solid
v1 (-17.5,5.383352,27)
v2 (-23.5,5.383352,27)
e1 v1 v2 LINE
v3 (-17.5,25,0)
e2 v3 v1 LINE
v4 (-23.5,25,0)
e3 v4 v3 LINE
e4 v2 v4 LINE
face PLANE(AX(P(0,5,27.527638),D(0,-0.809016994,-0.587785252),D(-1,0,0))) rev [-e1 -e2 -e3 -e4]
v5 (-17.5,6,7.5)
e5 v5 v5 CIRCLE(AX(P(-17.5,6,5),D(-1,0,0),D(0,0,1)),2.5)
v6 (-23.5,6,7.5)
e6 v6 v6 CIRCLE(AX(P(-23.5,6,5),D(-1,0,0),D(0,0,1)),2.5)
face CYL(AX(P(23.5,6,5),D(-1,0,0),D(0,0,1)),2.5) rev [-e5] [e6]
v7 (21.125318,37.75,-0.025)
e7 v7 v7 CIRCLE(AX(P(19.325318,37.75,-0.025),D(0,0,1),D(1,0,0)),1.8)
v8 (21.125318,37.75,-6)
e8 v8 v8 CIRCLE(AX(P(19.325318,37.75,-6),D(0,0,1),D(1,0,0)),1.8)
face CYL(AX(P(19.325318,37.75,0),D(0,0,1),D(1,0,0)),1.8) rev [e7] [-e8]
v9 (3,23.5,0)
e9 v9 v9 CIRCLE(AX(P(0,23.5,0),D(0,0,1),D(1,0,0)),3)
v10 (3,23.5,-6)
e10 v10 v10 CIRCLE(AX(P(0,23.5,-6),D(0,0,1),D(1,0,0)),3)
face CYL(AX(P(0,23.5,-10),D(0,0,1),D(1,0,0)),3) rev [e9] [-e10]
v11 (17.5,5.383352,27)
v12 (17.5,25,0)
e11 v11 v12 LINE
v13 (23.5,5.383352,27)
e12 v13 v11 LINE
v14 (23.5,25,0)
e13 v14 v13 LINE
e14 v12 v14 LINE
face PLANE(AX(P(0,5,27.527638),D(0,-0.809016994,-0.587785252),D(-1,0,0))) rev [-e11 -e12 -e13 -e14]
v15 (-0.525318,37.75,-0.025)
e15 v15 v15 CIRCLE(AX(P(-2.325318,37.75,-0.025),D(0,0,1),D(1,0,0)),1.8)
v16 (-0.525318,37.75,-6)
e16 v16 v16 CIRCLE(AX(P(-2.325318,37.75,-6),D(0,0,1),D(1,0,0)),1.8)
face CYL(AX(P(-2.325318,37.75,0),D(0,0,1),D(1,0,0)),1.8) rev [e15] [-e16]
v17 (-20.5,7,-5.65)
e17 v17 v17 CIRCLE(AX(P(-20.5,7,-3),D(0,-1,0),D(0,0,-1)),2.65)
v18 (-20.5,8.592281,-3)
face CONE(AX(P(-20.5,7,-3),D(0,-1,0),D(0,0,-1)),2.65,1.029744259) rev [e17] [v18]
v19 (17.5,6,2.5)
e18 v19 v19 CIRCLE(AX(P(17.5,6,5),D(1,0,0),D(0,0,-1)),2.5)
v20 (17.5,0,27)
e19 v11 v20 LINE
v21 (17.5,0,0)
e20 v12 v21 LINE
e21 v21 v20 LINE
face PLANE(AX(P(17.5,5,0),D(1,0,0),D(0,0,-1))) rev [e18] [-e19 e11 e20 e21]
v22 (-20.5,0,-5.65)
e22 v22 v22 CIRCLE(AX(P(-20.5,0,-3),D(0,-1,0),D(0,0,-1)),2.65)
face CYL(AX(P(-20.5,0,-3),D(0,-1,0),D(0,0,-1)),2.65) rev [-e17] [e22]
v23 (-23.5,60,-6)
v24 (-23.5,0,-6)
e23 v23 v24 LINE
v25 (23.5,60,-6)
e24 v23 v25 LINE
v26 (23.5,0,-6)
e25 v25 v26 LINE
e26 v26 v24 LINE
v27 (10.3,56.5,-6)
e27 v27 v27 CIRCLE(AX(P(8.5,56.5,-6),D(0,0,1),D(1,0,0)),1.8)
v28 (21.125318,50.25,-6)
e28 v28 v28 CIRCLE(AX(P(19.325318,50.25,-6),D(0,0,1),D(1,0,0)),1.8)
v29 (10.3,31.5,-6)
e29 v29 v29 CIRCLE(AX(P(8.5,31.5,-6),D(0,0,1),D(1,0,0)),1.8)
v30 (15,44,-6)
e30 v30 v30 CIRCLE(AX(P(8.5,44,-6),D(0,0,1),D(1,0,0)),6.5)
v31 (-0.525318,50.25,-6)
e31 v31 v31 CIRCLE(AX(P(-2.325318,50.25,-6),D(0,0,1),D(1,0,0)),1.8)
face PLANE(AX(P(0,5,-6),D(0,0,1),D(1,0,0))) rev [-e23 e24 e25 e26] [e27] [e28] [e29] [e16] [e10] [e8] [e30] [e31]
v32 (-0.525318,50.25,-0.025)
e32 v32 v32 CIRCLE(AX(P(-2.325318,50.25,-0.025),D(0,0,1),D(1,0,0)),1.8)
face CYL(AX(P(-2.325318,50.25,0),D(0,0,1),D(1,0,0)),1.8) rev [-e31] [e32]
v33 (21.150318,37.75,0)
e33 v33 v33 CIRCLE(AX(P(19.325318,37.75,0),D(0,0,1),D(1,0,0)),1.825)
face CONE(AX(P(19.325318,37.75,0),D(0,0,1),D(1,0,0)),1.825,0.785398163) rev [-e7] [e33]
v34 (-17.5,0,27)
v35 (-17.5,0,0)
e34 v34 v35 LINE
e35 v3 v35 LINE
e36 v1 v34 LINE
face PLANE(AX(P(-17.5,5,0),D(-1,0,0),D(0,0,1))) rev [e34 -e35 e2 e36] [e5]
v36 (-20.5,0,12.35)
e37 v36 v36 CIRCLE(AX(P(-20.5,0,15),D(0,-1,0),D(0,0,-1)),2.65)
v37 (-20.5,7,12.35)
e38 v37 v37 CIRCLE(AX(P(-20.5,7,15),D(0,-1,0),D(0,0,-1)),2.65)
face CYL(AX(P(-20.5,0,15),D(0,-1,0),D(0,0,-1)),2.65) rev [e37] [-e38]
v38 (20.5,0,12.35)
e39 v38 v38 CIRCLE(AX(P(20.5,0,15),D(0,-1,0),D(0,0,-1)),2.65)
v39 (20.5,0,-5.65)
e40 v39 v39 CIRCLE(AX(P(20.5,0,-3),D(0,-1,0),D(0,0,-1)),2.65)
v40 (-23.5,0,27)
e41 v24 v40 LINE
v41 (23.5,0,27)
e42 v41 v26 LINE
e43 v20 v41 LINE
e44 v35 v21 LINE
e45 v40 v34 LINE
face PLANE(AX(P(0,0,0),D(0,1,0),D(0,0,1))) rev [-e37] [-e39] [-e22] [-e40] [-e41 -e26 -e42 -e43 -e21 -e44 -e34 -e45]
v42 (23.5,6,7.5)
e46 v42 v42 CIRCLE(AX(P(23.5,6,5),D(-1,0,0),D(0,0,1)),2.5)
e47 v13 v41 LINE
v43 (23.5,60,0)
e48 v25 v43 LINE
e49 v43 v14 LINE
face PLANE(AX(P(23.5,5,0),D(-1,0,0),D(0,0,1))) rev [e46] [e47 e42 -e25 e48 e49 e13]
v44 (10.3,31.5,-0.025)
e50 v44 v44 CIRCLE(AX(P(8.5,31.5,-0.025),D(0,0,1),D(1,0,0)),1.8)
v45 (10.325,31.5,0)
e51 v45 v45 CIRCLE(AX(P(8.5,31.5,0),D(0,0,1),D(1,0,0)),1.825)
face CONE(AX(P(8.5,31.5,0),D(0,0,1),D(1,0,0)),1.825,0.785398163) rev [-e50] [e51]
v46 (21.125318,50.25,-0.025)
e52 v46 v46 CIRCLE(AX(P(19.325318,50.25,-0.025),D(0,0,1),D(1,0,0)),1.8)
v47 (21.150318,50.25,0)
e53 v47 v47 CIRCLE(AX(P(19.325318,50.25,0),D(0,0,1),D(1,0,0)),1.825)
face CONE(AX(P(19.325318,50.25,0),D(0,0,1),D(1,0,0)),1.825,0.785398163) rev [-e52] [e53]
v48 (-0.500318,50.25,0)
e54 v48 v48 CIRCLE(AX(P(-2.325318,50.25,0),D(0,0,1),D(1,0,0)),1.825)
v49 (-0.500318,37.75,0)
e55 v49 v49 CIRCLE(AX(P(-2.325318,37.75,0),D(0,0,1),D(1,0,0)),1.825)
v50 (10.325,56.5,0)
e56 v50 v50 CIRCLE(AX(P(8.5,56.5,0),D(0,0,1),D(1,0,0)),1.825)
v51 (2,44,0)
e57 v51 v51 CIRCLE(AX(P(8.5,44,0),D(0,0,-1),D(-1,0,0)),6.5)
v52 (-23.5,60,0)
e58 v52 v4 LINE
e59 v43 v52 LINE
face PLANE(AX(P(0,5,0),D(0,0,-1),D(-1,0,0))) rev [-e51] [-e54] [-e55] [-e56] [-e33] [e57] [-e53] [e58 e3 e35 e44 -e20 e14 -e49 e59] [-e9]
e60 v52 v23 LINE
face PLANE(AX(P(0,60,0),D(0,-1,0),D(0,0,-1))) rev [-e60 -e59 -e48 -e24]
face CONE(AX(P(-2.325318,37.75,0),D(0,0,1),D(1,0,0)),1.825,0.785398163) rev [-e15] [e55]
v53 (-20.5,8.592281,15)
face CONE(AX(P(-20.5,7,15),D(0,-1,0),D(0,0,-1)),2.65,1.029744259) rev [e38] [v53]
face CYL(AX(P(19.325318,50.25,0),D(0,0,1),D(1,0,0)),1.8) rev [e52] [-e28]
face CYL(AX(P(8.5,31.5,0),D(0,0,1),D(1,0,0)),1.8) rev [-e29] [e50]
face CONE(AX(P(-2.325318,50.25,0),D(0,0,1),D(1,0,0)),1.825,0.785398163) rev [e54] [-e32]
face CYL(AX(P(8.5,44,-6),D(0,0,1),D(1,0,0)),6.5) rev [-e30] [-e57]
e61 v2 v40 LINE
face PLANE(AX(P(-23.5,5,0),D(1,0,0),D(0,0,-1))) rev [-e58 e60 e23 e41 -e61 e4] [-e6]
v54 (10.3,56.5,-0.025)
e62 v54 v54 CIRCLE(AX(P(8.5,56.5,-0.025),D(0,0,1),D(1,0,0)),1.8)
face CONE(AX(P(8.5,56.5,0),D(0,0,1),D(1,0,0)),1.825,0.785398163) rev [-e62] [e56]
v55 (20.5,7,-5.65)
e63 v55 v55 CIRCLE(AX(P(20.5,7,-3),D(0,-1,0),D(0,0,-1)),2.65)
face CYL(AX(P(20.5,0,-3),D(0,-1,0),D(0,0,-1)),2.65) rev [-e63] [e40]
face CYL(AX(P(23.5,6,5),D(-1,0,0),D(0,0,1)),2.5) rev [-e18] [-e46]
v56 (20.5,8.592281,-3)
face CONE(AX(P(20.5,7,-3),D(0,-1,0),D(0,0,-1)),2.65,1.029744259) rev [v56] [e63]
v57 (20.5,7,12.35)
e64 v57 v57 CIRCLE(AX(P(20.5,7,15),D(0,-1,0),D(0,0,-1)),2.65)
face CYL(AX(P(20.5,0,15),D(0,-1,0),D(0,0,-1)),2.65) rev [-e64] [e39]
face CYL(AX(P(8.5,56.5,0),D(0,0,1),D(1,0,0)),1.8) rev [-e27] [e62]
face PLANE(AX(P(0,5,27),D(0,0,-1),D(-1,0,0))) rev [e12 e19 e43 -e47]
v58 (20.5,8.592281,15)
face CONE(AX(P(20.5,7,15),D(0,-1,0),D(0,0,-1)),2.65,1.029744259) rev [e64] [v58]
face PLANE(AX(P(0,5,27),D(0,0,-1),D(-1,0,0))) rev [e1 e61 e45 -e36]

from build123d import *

# Parameters (mm, degrees)
SKETCH1_W                      = 6
SKETCH1_H                      = 27
BOSS_EXTRUDE1_DEPTH            = 5
BOSS_EXTRUDE2_START            = 5
BOSS_EXTRUDE2_DEPTH            = 55
CHAMFER1_SIZE                  = 20
CHAMFER1_SIZE_2                = 27.527638409
M3_CLEARANCE_HOLE1_D           = 3.6
M3_CLEARANCE_HOLE1_CSINK_D     = 3.65
M3_CLEARANCE_HOLE1_CSINK_ANGLE = 90
CUT_EXTRUDE1_DEPTH             = 70.865943062
CUT_EXTRUDE1_DEPTH_BACK        = 70.865943062
SKETCH4_R                      = 6.5
F_5_3_5_3_DIAMETER_HOLE1_D     = 5.3
F_5_3_5_3_DIAMETER_HOLE1_DEPTH = 7
F_5_3_5_3_DIAMETER_HOLE1_TIP   = 1.59228064
SKETCH10_R                     = 3
CUT_EXTRUDE2_DEPTH             = 10
SKETCH11_R                     = 2.5
CUT_EXTRUDE3_DEPTH             = 81.857900047


with BuildPart() as part:
    # Sketch1 → Boss-Extrude1 (new body)
    with BuildSketch(Plane(origin=(0, 0, 0), x_dir=(1, 0, 0), z_dir=(0, 1, 0))):
        with Locations((-20.5, -13.5)):
            Rectangle(SKETCH1_W, SKETCH1_H)
        Polygon((-23.5, 0), (-17.5, 0), (17.5, 0), (23.5, 0), (23.5, 6), (-23.5, 6), align=None)
        with Locations((20.5, -13.5)):
            Rectangle(SKETCH1_W, SKETCH1_H)
    extrude(amount=BOSS_EXTRUDE1_DEPTH)

    # Sketch1<3> → Boss-Extrude2 (add)
    with BuildSketch(Plane(origin=(0, 0, 0), x_dir=(1, 0, 0), z_dir=(0, 1, 0)).offset(BOSS_EXTRUDE2_START)):
        Polygon((-23.5, 0), (-17.5, 0), (17.5, 0), (23.5, 0), (23.5, 6), (-23.5, 6), align=None)
    extrude(amount=BOSS_EXTRUDE2_DEPTH)

    # Chamfer1
    # the kernel refuses this chamfer: 27.527638409, 20 mm, written as the material it adds along each edge
    with BuildSketch(Plane(origin=(-53.564551252, 5, 0), x_dir=(0, 0.9990705747005859, -0.043104370630376254), z_dir=(1, 0, 0))) as chamfer1_piece_1_section:
        Polygon((CHAMFER1_SIZE * 0.999070574701, CHAMFER1_SIZE * 0.0431043706304), (-CHAMFER1_SIZE_2 * 0.043104370631, CHAMFER1_SIZE_2 * 0.999070574716), (0, 0), align=None)
    chamfer1_piece_1 = extrude(amount=77.064551252, mode=Mode.PRIVATE)
    chamfer1_piece_1 = split(chamfer1_piece_1, bisect_by=Plane(origin=(-23.5, 11.537219217, 9.073559483), z_dir=(1, 0, 0)), keep=Keep.TOP, mode=Mode.PRIVATE)
    chamfer1_piece_1 = split(chamfer1_piece_1, bisect_by=Plane(origin=(-17.5, 11.537219217, 9.073559483), z_dir=(-1, 0, 0)), keep=Keep.TOP, mode=Mode.PRIVATE)
    chamfer1_piece_1 = split(chamfer1_piece_1, bisect_by=Plane(origin=(-20.5, 11.537219217, 27), z_dir=(0, 0, -1)), keep=Keep.TOP, mode=Mode.PRIVATE)
    add(chamfer1_piece_1)
    with BuildSketch(Plane(origin=(17.5, 5, 0), x_dir=(0, 0.9990705747005859, -0.04310437063037649), z_dir=(1, 0, 0))) as chamfer1_piece_2_section:
        Polygon((CHAMFER1_SIZE * 0.999070574701, CHAMFER1_SIZE * 0.0431043706304), (-CHAMFER1_SIZE_2 * 0.043104370631, CHAMFER1_SIZE_2 * 0.999070574716), (0, 0), align=None)
    chamfer1_piece_2 = extrude(amount=6, mode=Mode.PRIVATE)
    chamfer1_piece_2 = split(chamfer1_piece_2, bisect_by=Plane(origin=(20.5, 11.537219217, 27), z_dir=(0, 0, -1)), keep=Keep.TOP, mode=Mode.PRIVATE)
    add(chamfer1_piece_2)
    with BuildSketch(Plane(origin=(-23.5, 5, 0), x_dir=(0, -0.022768510603911572, 0.9997407638607518), z_dir=(1, 0, 0))) as chamfer1_piece_3_section:
        Polygon((CHAMFER1_SIZE_2 * 0.999740763876, -CHAMFER1_SIZE_2 * 0.0227685106043), (-CHAMFER1_SIZE * 0.0227685106039, -CHAMFER1_SIZE * 0.999740763861), (0, 0), align=None)
    chamfer1_piece_3 = extrude(amount=6, mode=Mode.PRIVATE)
    chamfer1_piece_3 = split(chamfer1_piece_3, bisect_by=Plane(origin=(-20.5, 11.537219217, 27), z_dir=(0, 0, -1)), keep=Keep.TOP, mode=Mode.PRIVATE)
    add(chamfer1_piece_3)
    with BuildSketch(Plane(origin=(-23.5, 5, 0), x_dir=(0, -0.022768510603911572, 0.9997407638607518), z_dir=(1, 0, 0))) as chamfer1_piece_4_section:
        Polygon((CHAMFER1_SIZE_2 * 0.999740763876, -CHAMFER1_SIZE_2 * 0.0227685106043), (-CHAMFER1_SIZE * 0.0227685106039, -CHAMFER1_SIZE * 0.999740763861), (0, 0), align=None)
    chamfer1_piece_4 = extrude(amount=77.064551252, mode=Mode.PRIVATE)
    chamfer1_piece_4 = split(chamfer1_piece_4, bisect_by=Plane(origin=(20.5, 11.537219217, 27), z_dir=(0, 0, -1)), keep=Keep.TOP, mode=Mode.PRIVATE)
    chamfer1_piece_4 = split(chamfer1_piece_4, bisect_by=Plane(origin=(23.5, 11.537219217, 9.073559483), z_dir=(-1, 0, 0)), keep=Keep.TOP, mode=Mode.PRIVATE)
    chamfer1_piece_4 = split(chamfer1_piece_4, bisect_by=Plane(origin=(17.5, 11.537219217, 9.073559483), z_dir=(1, 0, 0)), keep=Keep.TOP, mode=Mode.PRIVATE)
    add(chamfer1_piece_4)

    # M3 Clearance Hole1 (through all)
    with Locations(Plane.XY):
        with Locations((8.5, 56.5), (19.325317547, 50.25), (19.325317547, 37.75), (8.5, 31.5), (-2.325317547, 37.75), (-2.325317547, 50.25)):
            CounterSinkHole(M3_CLEARANCE_HOLE1_D / 2, M3_CLEARANCE_HOLE1_CSINK_D / 2, counter_sink_angle=M3_CLEARANCE_HOLE1_CSINK_ANGLE)

    # Sketch4 → Cut-Extrude1 (cut, two sides: drawn at the far end of the back side and taken through both)
    with BuildSketch(Plane.XY.offset(-CUT_EXTRUDE1_DEPTH_BACK)):
        with Locations((8.5, 44)):
            Circle(SKETCH4_R)
    extrude(amount=CUT_EXTRUDE1_DEPTH + CUT_EXTRUDE1_DEPTH_BACK, mode=Mode.SUBTRACT)

    # Ø5.3 (5.3) Diameter Hole1
    with Locations(Plane(origin=(0, 0, 0), x_dir=(-1, 0, 0), z_dir=(0, -1, 0))):
        with Locations((-20.5, 3), (-20.5, -15), (20.5, 3), (20.5, -15)):
            Hole(F_5_3_5_3_DIAMETER_HOLE1_D / 2, depth=F_5_3_5_3_DIAMETER_HOLE1_DEPTH)
            with Locations((0, 0, -(F_5_3_5_3_DIAMETER_HOLE1_DEPTH + F_5_3_5_3_DIAMETER_HOLE1_TIP / 2))):  # 118° drill point
                Cone(0, F_5_3_5_3_DIAMETER_HOLE1_D / 2, F_5_3_5_3_DIAMETER_HOLE1_TIP, mode=Mode.SUBTRACT)

    # Sketch10 → Cut-Extrude2 (cut)
    with BuildSketch(Plane.XY):
        with Locations((0, 23.5)):
            Circle(SKETCH10_R)
    extrude(amount=-CUT_EXTRUDE2_DEPTH, mode=Mode.SUBTRACT)

    # Sketch11 → Cut-Extrude3 (cut, through all)
    with BuildSketch(Plane.ZY.offset(23.5)):
        with Locations((5, 6)):
            Circle(SKETCH11_R)
    extrude(amount=-CUT_EXTRUDE3_DEPTH, mode=Mode.SUBTRACT)


solid = part.part
